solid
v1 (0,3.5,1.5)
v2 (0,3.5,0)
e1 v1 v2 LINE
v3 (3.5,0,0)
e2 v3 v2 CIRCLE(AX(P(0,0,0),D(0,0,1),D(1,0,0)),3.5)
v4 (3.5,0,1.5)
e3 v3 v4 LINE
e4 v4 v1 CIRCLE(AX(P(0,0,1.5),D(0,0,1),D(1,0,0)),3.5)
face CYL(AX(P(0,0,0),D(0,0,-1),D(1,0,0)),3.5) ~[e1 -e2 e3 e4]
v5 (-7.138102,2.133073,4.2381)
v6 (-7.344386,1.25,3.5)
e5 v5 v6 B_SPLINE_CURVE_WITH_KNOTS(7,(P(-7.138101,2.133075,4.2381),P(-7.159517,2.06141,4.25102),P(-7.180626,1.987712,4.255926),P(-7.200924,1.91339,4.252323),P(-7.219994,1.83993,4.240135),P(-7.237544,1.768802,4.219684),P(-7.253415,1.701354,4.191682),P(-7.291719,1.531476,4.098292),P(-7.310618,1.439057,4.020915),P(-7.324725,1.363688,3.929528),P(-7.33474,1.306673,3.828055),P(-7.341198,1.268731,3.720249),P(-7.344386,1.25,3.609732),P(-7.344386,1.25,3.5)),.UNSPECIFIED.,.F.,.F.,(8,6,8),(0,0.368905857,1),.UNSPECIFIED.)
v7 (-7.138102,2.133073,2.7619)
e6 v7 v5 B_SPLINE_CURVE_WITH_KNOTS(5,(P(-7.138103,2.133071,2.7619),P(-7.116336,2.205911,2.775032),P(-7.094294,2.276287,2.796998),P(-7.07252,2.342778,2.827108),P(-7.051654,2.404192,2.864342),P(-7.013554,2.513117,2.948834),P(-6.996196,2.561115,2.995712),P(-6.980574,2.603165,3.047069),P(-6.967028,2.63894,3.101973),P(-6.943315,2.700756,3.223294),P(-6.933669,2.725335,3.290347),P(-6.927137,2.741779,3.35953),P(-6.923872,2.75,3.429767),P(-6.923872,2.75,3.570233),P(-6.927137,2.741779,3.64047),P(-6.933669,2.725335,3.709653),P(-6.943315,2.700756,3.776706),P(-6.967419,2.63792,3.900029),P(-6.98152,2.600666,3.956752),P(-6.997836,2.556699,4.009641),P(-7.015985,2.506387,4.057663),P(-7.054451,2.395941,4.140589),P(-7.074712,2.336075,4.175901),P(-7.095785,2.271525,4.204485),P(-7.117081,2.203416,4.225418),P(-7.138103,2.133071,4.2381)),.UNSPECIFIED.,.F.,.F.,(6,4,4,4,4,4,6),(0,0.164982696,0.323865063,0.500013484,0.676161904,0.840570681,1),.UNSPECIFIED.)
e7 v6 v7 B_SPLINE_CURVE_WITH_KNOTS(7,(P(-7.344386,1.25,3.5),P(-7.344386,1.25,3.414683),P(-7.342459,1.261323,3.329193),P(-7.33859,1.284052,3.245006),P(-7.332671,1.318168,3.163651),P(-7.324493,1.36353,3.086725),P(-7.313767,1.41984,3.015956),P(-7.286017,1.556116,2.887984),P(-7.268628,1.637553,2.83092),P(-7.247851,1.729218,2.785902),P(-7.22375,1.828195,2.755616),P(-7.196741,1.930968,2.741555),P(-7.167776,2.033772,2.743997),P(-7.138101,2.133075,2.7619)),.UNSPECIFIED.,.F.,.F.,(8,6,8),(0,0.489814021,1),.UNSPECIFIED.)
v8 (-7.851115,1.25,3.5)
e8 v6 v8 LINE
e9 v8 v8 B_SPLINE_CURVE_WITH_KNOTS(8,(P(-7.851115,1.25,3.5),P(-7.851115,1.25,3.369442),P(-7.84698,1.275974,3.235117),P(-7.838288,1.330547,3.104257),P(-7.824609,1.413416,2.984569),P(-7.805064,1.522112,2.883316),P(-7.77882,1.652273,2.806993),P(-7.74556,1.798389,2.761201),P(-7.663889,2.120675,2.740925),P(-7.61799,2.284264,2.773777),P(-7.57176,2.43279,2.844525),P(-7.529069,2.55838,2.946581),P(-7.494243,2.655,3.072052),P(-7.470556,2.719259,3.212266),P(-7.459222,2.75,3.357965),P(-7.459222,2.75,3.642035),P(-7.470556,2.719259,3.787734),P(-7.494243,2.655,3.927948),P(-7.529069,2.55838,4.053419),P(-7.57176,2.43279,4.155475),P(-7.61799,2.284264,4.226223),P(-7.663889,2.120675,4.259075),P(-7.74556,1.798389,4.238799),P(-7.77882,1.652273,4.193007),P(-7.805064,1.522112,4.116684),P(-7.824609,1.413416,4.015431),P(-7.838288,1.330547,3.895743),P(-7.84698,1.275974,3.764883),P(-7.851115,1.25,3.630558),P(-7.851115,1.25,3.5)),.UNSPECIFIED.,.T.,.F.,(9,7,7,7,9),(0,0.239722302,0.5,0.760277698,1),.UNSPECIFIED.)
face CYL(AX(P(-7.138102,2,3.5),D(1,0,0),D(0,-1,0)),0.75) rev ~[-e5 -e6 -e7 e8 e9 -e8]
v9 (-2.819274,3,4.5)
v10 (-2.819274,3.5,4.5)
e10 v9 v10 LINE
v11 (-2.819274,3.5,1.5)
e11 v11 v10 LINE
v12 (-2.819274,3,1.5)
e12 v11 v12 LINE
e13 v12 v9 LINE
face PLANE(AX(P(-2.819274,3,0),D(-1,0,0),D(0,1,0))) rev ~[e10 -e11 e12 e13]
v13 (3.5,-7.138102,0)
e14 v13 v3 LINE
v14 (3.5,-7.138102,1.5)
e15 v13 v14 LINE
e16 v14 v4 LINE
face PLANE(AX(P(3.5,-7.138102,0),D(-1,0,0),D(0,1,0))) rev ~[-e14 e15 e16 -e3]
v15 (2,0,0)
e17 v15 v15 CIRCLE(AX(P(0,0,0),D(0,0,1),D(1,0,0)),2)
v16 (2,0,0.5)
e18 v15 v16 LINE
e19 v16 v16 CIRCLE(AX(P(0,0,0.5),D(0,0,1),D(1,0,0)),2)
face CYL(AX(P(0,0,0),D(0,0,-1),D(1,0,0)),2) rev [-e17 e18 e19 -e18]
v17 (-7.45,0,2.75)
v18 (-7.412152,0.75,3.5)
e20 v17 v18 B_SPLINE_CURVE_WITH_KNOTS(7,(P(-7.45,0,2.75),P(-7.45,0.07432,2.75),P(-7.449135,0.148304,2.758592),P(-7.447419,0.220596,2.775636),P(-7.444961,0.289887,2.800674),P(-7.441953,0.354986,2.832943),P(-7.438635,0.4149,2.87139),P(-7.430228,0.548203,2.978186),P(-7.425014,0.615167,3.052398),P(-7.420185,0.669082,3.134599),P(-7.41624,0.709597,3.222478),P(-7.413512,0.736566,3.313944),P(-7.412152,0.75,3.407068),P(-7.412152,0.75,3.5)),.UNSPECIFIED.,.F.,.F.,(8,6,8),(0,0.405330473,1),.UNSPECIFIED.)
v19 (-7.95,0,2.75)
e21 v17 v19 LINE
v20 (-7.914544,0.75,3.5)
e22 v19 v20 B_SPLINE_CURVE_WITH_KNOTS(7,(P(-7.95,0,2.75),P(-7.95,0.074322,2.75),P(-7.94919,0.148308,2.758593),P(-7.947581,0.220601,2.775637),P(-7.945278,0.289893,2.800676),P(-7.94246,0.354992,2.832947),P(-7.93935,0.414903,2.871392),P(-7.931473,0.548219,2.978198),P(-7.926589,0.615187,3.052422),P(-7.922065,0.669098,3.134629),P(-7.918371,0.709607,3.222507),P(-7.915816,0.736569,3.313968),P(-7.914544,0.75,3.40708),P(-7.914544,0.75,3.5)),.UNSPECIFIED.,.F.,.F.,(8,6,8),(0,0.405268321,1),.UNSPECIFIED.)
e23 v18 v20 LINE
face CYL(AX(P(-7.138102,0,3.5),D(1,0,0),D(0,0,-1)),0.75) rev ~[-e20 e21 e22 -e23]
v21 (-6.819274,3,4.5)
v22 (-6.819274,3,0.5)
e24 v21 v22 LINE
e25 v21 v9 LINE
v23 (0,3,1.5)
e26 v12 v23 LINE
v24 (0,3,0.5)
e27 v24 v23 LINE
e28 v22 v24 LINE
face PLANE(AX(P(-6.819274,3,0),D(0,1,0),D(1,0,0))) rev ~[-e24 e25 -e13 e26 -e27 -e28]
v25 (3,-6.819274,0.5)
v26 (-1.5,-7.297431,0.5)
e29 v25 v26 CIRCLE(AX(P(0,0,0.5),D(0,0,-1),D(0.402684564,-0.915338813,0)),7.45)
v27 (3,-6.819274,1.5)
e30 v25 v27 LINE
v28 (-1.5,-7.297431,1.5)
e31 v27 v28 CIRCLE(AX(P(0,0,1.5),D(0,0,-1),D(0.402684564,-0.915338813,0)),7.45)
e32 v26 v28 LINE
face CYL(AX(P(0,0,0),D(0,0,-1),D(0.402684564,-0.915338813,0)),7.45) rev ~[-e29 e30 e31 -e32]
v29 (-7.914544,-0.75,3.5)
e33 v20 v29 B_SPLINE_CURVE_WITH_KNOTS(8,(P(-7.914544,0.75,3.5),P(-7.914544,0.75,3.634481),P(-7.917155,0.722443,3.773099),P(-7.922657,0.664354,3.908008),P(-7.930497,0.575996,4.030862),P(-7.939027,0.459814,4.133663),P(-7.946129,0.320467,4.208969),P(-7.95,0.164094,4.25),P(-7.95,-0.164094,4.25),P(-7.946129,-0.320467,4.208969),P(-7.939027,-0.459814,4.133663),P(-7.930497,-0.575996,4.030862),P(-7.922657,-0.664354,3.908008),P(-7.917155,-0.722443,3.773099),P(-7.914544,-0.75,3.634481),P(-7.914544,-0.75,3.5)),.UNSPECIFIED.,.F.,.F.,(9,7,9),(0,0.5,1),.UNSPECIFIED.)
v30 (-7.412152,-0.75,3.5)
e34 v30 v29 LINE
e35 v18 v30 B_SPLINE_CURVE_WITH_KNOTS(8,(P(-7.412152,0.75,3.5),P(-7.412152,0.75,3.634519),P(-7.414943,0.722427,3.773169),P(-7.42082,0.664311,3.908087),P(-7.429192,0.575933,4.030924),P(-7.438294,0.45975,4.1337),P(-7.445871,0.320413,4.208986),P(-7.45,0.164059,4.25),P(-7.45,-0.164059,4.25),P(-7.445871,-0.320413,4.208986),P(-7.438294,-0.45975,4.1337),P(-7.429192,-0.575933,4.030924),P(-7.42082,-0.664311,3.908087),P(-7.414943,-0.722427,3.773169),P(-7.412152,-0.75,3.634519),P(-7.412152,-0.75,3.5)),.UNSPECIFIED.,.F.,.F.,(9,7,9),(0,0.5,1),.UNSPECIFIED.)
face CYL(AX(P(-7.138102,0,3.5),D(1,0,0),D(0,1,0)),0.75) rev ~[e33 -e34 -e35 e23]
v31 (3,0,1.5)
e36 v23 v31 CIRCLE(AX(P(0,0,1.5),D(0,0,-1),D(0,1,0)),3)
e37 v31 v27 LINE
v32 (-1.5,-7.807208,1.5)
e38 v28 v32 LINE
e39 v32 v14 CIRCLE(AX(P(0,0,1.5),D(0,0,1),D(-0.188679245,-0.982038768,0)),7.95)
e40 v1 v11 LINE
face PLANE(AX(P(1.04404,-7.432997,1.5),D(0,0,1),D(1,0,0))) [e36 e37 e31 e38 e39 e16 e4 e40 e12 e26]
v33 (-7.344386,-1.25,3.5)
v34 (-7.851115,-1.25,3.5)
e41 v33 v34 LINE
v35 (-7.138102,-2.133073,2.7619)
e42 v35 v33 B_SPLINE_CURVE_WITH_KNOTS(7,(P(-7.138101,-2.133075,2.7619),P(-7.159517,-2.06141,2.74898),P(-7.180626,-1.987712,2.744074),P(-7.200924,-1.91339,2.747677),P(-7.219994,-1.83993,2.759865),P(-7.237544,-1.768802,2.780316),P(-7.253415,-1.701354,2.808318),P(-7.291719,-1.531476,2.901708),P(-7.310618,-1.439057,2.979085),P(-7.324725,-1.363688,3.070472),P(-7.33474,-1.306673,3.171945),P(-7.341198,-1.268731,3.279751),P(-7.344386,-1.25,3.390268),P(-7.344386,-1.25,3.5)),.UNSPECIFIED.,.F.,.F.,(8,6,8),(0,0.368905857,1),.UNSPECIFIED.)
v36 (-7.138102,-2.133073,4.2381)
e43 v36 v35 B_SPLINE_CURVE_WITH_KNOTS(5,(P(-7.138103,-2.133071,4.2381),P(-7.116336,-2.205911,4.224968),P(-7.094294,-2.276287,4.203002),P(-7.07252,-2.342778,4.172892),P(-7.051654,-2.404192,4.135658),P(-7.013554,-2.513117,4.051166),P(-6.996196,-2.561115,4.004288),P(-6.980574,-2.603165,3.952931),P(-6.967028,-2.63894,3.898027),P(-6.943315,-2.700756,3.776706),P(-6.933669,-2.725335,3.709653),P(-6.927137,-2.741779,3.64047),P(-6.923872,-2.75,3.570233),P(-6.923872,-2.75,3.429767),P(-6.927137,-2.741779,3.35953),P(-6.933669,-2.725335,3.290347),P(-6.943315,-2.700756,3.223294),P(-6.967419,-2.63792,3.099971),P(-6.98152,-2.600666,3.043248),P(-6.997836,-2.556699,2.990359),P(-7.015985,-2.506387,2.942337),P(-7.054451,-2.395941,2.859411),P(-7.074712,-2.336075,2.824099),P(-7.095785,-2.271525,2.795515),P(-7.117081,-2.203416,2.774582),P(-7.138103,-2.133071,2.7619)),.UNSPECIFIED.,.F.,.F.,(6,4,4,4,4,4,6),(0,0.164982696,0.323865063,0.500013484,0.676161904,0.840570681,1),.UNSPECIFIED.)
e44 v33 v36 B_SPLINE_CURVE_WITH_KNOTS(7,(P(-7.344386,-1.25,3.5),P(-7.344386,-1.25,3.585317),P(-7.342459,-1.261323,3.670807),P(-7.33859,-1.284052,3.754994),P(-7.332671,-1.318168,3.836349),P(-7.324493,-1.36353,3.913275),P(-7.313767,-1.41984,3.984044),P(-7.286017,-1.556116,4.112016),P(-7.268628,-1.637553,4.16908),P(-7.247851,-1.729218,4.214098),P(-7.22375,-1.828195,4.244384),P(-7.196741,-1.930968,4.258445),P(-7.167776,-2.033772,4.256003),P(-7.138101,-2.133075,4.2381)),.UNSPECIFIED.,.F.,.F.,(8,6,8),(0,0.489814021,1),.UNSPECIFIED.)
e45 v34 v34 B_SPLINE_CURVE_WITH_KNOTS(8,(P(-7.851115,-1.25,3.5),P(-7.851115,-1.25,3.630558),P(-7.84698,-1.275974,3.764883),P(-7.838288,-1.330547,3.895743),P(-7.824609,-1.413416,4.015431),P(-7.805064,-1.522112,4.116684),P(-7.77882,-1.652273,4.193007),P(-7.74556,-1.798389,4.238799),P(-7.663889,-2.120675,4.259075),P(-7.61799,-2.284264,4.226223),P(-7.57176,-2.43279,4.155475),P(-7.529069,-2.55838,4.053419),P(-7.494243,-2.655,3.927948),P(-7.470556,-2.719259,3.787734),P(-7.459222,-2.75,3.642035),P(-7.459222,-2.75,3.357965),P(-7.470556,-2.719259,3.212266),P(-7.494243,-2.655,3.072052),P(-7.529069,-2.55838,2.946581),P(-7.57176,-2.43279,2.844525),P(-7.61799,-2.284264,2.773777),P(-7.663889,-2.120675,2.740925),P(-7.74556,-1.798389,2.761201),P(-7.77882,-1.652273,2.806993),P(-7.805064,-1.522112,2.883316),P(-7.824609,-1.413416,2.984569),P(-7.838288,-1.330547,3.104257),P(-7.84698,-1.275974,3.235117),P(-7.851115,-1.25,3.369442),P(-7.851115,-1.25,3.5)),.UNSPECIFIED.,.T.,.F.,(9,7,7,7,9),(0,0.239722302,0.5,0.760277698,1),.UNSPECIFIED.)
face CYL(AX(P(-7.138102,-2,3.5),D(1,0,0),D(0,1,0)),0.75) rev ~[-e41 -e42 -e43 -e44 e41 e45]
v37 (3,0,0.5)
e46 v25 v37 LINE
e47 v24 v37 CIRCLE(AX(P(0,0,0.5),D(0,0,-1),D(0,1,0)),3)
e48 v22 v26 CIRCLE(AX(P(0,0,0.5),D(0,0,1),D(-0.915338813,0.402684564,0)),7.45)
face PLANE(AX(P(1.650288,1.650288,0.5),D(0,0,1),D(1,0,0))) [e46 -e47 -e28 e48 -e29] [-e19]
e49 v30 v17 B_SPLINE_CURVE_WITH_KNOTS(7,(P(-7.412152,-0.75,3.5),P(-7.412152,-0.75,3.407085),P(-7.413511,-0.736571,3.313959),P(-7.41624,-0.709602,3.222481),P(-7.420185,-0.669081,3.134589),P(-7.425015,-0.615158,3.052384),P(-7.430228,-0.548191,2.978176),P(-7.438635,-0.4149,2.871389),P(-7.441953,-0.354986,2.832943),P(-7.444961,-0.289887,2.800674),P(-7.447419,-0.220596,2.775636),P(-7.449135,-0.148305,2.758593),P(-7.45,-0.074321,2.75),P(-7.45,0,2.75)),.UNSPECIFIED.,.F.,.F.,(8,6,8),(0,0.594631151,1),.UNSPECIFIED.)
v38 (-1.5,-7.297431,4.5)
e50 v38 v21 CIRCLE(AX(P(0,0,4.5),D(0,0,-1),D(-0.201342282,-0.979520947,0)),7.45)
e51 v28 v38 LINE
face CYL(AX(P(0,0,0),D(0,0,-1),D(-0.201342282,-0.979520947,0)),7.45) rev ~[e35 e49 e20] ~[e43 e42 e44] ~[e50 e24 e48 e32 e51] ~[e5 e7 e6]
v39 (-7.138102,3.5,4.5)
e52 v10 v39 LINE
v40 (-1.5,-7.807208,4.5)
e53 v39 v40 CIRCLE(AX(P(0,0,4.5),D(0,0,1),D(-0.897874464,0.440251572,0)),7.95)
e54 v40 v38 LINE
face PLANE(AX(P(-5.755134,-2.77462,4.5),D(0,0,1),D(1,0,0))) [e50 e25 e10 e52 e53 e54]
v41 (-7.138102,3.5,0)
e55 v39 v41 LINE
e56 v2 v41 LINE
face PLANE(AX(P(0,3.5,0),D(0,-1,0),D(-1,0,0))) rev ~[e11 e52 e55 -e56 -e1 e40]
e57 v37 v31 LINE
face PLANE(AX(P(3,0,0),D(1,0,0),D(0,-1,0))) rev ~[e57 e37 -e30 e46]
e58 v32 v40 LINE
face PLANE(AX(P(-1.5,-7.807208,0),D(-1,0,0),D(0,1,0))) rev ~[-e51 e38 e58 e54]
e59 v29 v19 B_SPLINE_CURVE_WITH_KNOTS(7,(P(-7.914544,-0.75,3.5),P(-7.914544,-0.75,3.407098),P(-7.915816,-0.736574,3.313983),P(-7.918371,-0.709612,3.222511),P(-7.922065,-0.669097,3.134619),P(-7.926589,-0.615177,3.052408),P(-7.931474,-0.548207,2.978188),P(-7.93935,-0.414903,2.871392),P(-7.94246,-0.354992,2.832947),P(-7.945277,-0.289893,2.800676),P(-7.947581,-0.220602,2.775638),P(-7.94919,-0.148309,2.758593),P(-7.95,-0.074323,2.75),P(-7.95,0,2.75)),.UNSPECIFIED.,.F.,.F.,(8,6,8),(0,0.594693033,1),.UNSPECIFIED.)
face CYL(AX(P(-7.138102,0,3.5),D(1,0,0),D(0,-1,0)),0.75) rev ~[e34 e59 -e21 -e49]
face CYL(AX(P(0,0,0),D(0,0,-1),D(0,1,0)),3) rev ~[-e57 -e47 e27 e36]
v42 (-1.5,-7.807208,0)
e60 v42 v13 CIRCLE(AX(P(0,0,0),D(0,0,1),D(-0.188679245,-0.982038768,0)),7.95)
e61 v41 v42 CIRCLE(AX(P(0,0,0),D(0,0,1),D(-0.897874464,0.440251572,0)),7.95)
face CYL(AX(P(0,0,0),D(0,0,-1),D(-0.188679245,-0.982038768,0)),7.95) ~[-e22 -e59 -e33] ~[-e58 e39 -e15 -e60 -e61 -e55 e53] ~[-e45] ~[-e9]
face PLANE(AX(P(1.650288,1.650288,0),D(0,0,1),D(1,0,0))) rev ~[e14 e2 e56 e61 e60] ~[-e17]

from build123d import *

# Parameters (mm, degrees)
F0_R          = 2
F1_DEPTH      = 0.5
F2_DEPTH      = 1.5
F3_DEPTH      = 4.5
F5_R          = 0.75
F6_DEPTH      = 22
F6_DEPTH_BACK = 1.8118981114


# Not quite as in the source:
# - an extrude ends at something that could not be found from the text; its depth is read off the source's solid
# - a feature names something its author has since deleted; it is built from what else it names


with BuildPart() as f1:
    # F0 (on Top) → F1 (new body)
    with BuildSketch(Plane.XY):
        with BuildLine():
            ThreePointArc((3, -1.8027756377), (3.3726843908, -0.9354143467), (3.5, 0))
            ThreePointArc((3.5, 0), (2.4748737342, 2.4748737342), (0, 3.5))
            ThreePointArc((0, 3.5), (-0.9354143467, 3.3726843908), (-1.8027756377, 3))
            Line((-1.8027756377, 3), (0, 3))
            ThreePointArc((0, 3), (2.1213203436, 2.1213203436), (3, 0))
            Line((3, 0), (3, -1.8027756377))
        make_face()
        with BuildLine():
            ThreePointArc((-1.8027756377, 3), (-0.9354143467, 3.3726843908), (0, 3.5))
            Line((0, 3.5), (-2.8192741549, 3.5))
            Line((-2.8192741549, 3.5), (-2.8192741549, 3))
            Line((-2.8192741549, 3), (-1.8027756377, 3))
        make_face()
        with BuildLine():
            Line((3.5, -7.1381019886), (3.5, -6.5766632877))
            ThreePointArc((3.5, -6.5766632877), (3.2522630595, -6.7026326911), (3, -6.8192741549))
            ThreePointArc((3, -6.8192741549), (0.7871839081, -7.4082954514), (-1.5, -7.2974310548))
            Line((-1.5, -7.2974310548), (-1.5, -7.8072082078))
            ThreePointArc((-1.5, -7.8072082078), (1.0544789155, -7.8797572435), (3.5, -7.1381019886))
        make_face()
        with BuildLine():
            Line((3.5, -6.5766632877), (3.5, 0))
            ThreePointArc((3.5, 0), (3.3726843908, -0.9354143467), (3, -1.8027756377))
            Line((3, -1.8027756377), (3, -6.8192741549))
            ThreePointArc((3, -6.8192741549), (3.2522630595, -6.7026326911), (3.5, -6.5766632877))
        make_face()
        with BuildLine():
            Line((3, -6.8192741549), (3, -1.8027756377))
            ThreePointArc((3, -1.8027756377), (-2.4748737342, -2.4748737342), (-1.8027756377, 3))
            Line((-1.8027756377, 3), (-2.8192741549, 3))
            Line((-2.8192741549, 3), (-6.8192741549, 3))
            ThreePointArc((-6.8192741549, 3), (-6.619052213, -3.4191589319), (-1.5, -7.2974310548))
            ThreePointArc((-1.5, -7.2974310548), (0.7871839081, -7.4082954514), (3, -6.8192741549))
        make_face()
        with BuildLine():
            ThreePointArc((-1.8027756377, 3), (-2.4748737342, -2.4748737342), (3, -1.8027756377))
            Line((3, -1.8027756377), (3, 0))
            ThreePointArc((3, 0), (-2.1213203436, -2.1213203436), (0, 3))
            Line((0, 3), (-1.8027756377, 3))
        make_face()
        with BuildLine():
            ThreePointArc((0, 3), (-2.1213203436, -2.1213203436), (3, 0))
            ThreePointArc((3, 0), (2.1213203436, 2.1213203436), (0, 3))
        make_face()
        Circle(F0_R, mode=Mode.SUBTRACT)
    extrude(amount=F1_DEPTH)

    # F0 (on Top) → F2 (join)
    with BuildSketch(Plane.XY):
        with BuildLine():
            Line((3.5, -7.1381019886), (3.5, -6.5766632877))
            ThreePointArc((3.5, -6.5766632877), (3.2522630595, -6.7026326911), (3, -6.8192741549))
            ThreePointArc((3, -6.8192741549), (0.7871839081, -7.4082954514), (-1.5, -7.2974310548))
            Line((-1.5, -7.2974310548), (-1.5, -7.8072082078))
            ThreePointArc((-1.5, -7.8072082078), (1.0544789155, -7.8797572435), (3.5, -7.1381019886))
        make_face()
        with BuildLine():
            Line((3.5, -6.5766632877), (3.5, 0))
            ThreePointArc((3.5, 0), (3.3726843908, -0.9354143467), (3, -1.8027756377))
            Line((3, -1.8027756377), (3, -6.8192741549))
            ThreePointArc((3, -6.8192741549), (3.2522630595, -6.7026326911), (3.5, -6.5766632877))
        make_face()
        with BuildLine():
            ThreePointArc((3, -1.8027756377), (3.3726843908, -0.9354143467), (3.5, 0))
            ThreePointArc((3.5, 0), (2.4748737342, 2.4748737342), (0, 3.5))
            ThreePointArc((0, 3.5), (-0.9354143467, 3.3726843908), (-1.8027756377, 3))
            Line((-1.8027756377, 3), (0, 3))
            ThreePointArc((0, 3), (2.1213203436, 2.1213203436), (3, 0))
            Line((3, 0), (3, -1.8027756377))
        make_face()
        with BuildLine():
            ThreePointArc((-1.8027756377, 3), (-0.9354143467, 3.3726843908), (0, 3.5))
            Line((0, 3.5), (-2.8192741549, 3.5))
            Line((-2.8192741549, 3.5), (-2.8192741549, 3))
            Line((-2.8192741549, 3), (-1.8027756377, 3))
        make_face()
        with BuildLine():
            Line((-2.8192741549, 3), (-2.8192741549, 3.5))
            Line((-2.8192741549, 3.5), (-6.5766632877, 3.5))
            ThreePointArc((-6.5766632877, 3.5), (-6.7026326911, 3.2522630595), (-6.8192741549, 3))
            Line((-6.8192741549, 3), (-2.8192741549, 3))
        make_face()
        with BuildLine():
            ThreePointArc((-6.8192741549, 3), (-6.7026326911, 3.2522630595), (-6.5766632877, 3.5))
            Line((-6.5766632877, 3.5), (-7.1381019886, 3.5))
            ThreePointArc((-7.1381019886, 3.5), (-7.114593513, -3.5475426911), (-1.5, -7.8072082078))
            Line((-1.5, -7.8072082078), (-1.5, -7.2974310548))
            ThreePointArc((-1.5, -7.2974310548), (-6.619052213, -3.4191589319), (-6.8192741549, 3))
        make_face()
    extrude(amount=F2_DEPTH)

    # F0 (on Top) → F3 (join)
    with BuildSketch(Plane.XY):
        with BuildLine():
            ThreePointArc((-6.8192741549, 3), (-6.7026326911, 3.2522630595), (-6.5766632877, 3.5))
            Line((-6.5766632877, 3.5), (-7.1381019886, 3.5))
            ThreePointArc((-7.1381019886, 3.5), (-7.114593513, -3.5475426911), (-1.5, -7.8072082078))
            Line((-1.5, -7.8072082078), (-1.5, -7.2974310548))
            ThreePointArc((-1.5, -7.2974310548), (-6.619052213, -3.4191589319), (-6.8192741549, 3))
        make_face()
        with BuildLine():
            Line((-2.8192741549, 3), (-2.8192741549, 3.5))
            Line((-2.8192741549, 3.5), (-6.5766632877, 3.5))
            ThreePointArc((-6.5766632877, 3.5), (-6.7026326911, 3.2522630595), (-6.8192741549, 3))
            Line((-6.8192741549, 3), (-2.8192741549, 3))
        make_face()
    extrude(amount=F3_DEPTH)

    # F5 (on plane+point) → F6 (cut, two sides)
    with BuildSketch(Plane.YZ.offset(-7.1381019886)) as f6_sk:
        with BuildLine():
            ThreePointArc((2.75, 3.5), (2, 4.25), (1.25, 3.5))
            ThreePointArc((1.25, 3.5), (2, 2.75), (2.75, 3.5))
        make_face()
        with BuildLine():
            Line((0, 3.5), (0, 2.75))
            ThreePointArc((0, 2.75), (0.5303300859, 2.9696699141), (0.75, 3.5))
            Line((0.75, 3.5), (0, 3.5))
        make_face()
        with BuildLine():
            Line((-0.75, 3.5), (0, 3.5))
            Line((0, 3.5), (0.75, 3.5))
            ThreePointArc((0.75, 3.5), (0, 4.25), (-0.75, 3.5))
        make_face()
        with BuildLine():
            ThreePointArc((-0.75, 3.5), (-0.5303300859, 2.9696699141), (0, 2.75))
            Line((0, 2.75), (0, 3.5))
            Line((0, 3.5), (-0.75, 3.5))
        make_face()
        with Locations((-2, 3.5)):
            Circle(F5_R)
    extrude(amount=F6_DEPTH, mode=Mode.SUBTRACT)
    extrude(f6_sk.sketch, amount=-F6_DEPTH_BACK, mode=Mode.SUBTRACT)


solid = f1.part
